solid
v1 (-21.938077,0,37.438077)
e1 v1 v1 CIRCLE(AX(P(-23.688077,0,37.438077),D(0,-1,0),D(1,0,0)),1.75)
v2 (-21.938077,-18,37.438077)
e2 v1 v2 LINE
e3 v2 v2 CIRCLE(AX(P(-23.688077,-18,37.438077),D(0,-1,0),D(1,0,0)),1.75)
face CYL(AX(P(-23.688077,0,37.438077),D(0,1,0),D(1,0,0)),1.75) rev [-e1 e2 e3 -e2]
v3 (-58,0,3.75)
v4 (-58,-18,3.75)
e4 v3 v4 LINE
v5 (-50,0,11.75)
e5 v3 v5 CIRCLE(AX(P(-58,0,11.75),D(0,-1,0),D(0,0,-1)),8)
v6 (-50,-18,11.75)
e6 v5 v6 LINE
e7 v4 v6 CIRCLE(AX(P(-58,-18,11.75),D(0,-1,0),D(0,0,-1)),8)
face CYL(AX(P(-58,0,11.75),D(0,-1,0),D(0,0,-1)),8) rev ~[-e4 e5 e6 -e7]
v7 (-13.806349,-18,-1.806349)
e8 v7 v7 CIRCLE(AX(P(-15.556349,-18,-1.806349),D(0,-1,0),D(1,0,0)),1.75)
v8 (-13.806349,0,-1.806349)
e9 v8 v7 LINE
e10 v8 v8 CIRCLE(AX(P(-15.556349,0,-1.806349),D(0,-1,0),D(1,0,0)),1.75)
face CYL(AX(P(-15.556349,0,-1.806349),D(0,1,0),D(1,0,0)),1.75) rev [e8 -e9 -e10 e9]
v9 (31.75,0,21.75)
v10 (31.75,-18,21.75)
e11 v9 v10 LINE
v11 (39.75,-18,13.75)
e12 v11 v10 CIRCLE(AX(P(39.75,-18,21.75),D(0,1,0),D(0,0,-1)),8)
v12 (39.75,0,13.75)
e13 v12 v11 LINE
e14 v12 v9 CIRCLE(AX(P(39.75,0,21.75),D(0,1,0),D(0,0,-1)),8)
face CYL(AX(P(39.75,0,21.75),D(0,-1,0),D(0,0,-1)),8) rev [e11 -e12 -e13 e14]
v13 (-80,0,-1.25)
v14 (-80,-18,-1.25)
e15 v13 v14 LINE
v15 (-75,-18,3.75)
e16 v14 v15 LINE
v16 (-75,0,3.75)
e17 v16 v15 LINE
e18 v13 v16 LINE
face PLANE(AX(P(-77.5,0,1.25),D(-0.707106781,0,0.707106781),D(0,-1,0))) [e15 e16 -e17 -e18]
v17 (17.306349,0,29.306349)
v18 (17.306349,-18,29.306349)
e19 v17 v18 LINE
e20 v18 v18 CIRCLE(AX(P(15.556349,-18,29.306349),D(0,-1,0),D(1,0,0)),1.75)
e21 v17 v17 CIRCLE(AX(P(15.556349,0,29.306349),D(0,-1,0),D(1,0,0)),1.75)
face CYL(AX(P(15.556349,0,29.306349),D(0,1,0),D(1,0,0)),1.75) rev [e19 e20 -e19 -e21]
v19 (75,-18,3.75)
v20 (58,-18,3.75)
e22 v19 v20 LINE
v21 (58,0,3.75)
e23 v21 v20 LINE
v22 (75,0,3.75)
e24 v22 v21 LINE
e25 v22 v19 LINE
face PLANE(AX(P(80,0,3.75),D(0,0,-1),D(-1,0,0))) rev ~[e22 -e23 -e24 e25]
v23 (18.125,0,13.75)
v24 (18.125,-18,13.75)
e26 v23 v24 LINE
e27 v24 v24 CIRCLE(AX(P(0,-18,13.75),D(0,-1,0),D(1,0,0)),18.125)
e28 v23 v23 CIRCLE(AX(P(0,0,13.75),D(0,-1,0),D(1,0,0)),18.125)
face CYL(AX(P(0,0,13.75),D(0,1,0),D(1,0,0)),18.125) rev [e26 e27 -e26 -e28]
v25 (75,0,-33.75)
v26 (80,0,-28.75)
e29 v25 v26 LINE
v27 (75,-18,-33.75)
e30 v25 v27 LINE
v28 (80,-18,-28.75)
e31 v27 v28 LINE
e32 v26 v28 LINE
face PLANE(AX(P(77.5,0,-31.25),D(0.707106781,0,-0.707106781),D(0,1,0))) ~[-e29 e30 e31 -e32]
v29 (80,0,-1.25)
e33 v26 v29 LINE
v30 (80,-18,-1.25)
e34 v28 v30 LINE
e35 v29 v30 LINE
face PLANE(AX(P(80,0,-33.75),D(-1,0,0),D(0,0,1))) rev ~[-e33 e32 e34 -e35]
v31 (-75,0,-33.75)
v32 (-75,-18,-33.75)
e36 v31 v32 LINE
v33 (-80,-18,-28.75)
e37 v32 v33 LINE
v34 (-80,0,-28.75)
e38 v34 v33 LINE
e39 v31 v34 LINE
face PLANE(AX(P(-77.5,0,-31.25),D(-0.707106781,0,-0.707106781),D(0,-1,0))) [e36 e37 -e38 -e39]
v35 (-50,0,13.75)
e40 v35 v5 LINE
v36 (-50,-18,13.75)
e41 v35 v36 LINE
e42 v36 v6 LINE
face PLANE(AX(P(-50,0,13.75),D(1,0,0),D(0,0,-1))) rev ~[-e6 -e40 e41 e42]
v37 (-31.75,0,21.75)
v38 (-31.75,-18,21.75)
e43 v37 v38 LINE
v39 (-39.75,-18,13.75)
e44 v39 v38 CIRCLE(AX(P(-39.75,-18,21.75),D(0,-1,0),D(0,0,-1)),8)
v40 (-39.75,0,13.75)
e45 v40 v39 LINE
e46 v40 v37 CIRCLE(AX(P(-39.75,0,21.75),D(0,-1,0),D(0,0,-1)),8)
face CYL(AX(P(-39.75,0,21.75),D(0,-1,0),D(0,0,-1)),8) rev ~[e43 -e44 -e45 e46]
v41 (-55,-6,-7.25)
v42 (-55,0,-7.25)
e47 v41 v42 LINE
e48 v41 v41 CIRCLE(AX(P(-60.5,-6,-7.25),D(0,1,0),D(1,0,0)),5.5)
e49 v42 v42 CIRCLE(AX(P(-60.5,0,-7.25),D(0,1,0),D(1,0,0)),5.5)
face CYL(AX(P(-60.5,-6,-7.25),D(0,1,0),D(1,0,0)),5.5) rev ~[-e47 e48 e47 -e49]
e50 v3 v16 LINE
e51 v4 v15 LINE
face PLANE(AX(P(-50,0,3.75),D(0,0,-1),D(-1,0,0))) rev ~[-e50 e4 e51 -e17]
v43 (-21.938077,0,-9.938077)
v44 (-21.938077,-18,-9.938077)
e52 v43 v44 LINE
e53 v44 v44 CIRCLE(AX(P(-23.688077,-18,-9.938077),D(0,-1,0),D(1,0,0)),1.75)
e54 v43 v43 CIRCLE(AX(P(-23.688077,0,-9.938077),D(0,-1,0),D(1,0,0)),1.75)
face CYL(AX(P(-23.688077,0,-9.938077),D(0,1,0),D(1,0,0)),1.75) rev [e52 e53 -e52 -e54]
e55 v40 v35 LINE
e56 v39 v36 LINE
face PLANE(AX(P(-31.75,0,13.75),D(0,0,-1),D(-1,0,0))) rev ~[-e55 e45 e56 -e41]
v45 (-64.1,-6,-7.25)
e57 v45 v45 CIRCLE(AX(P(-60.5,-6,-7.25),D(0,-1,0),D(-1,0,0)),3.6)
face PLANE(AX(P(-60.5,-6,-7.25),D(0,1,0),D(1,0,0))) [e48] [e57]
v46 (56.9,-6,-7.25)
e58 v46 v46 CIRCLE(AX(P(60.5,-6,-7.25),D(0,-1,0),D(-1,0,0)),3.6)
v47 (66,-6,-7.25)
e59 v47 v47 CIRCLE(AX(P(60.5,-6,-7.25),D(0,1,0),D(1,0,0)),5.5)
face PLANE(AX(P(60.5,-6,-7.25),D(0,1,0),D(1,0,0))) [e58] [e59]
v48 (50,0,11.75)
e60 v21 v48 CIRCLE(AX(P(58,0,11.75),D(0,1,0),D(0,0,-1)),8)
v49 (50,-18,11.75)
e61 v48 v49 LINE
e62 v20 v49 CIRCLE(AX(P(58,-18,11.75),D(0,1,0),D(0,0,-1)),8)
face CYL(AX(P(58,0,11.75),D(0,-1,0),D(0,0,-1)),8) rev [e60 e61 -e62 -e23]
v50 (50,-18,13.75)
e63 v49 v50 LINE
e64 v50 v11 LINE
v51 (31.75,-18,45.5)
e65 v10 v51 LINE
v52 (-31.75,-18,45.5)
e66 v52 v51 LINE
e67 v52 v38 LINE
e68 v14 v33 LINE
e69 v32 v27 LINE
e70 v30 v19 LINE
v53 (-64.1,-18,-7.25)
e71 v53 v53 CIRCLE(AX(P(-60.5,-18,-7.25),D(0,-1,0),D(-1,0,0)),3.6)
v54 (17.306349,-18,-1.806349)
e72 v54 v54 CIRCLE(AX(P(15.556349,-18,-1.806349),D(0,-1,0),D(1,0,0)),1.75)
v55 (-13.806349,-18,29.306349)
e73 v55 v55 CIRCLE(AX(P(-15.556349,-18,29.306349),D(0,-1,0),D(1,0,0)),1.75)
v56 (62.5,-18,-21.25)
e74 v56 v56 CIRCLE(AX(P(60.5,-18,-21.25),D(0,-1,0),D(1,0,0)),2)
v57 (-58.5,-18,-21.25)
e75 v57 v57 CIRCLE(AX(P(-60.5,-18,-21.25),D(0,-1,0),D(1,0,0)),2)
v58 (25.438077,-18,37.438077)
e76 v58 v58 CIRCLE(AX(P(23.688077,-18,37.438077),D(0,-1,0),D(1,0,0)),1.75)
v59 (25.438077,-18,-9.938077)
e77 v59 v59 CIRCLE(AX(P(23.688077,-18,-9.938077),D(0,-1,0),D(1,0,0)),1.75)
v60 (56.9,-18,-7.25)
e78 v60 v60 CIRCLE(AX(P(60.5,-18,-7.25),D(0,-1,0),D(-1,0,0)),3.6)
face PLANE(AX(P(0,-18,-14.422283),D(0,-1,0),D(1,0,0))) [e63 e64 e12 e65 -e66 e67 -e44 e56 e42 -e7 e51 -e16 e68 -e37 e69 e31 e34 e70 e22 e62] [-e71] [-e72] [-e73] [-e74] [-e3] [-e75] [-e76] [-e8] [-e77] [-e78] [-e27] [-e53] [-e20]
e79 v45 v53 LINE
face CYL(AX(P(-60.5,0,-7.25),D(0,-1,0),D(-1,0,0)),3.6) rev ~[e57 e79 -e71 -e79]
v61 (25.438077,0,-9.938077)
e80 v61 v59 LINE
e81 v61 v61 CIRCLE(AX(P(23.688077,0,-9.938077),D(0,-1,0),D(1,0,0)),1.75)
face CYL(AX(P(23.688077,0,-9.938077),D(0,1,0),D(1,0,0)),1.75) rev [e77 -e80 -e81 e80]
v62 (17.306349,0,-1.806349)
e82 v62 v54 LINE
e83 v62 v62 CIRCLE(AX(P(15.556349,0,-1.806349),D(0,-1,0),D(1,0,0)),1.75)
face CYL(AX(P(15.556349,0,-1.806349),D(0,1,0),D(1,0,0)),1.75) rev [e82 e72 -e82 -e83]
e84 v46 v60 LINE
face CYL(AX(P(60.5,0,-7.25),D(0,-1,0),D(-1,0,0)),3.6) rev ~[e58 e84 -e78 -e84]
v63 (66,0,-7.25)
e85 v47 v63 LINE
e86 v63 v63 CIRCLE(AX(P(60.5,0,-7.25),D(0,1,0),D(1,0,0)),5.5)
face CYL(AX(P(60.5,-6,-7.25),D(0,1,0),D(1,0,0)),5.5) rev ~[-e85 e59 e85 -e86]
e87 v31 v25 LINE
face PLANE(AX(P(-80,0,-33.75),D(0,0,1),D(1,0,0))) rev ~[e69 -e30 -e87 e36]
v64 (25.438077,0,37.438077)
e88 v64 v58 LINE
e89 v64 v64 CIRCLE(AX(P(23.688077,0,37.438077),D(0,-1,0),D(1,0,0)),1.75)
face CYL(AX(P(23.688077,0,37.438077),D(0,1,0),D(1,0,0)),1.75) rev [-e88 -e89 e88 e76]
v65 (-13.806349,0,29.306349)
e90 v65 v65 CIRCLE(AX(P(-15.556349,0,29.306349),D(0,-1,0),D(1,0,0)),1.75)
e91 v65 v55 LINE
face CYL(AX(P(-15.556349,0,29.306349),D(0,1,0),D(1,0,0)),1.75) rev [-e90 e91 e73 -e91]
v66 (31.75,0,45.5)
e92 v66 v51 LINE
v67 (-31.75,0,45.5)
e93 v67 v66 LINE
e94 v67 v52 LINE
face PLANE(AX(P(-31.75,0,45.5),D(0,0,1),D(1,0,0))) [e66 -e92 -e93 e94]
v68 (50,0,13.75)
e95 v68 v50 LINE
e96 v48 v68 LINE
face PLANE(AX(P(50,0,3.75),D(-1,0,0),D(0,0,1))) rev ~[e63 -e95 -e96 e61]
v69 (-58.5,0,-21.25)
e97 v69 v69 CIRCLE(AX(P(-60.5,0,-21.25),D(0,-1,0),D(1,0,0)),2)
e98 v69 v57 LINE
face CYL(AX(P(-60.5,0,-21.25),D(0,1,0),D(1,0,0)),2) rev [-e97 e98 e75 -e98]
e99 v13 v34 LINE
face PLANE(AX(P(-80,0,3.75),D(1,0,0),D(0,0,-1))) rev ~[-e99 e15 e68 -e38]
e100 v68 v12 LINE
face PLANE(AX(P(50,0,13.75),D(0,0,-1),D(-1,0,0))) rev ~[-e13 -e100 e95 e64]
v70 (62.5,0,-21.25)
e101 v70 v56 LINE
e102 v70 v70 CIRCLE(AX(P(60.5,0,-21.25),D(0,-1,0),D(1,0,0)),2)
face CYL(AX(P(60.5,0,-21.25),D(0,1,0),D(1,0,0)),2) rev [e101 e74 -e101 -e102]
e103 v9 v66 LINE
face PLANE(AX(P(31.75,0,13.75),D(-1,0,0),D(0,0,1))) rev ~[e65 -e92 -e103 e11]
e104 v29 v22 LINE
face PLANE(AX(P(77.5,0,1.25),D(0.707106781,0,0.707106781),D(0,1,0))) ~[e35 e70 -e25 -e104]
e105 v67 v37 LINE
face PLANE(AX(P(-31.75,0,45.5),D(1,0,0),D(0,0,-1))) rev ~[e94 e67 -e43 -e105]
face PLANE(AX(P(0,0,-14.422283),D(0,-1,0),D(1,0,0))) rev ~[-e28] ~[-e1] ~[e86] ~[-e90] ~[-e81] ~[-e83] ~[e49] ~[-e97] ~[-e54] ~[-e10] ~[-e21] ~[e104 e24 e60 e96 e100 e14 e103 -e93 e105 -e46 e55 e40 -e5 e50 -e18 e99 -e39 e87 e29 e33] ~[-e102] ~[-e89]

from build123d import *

# Parameters (mm, degrees)
F0_R           = 2
F0_W           = 63.5
F0_H           = 11.75
F0_R_2         = 1.75
F0_R_3         = 18.125
F1_DEPTH       = 18
F2_SIZE        = 5
F3_R           = 8
F4_D           = 7.2
F4_DEPTH       = 35
F4_CBORE_D     = 11
F4_CBORE_DEPTH = 6
F4_TIP         = 2.1630982285


with BuildPart() as f1:
    # F0 (on Front) → F1 (new body)
    with BuildSketch(Plane.XZ):
        Polygon((-80, -33.75), (80, -33.75), (80, 3.75), (50, 3.75), (50, 13.75), (31.75, 13.75), (31.75, -18), (-31.75, -18), (-31.75, 13.75), (-50, 13.75), (-50, 3.75), (-80, 3.75), align=None)
        with Locations((-60.5, -21.25)):
            Circle(F0_R, mode=Mode.SUBTRACT)
        with Locations((60.5, -21.25)):
            Circle(F0_R, mode=Mode.SUBTRACT)
        with Locations((0, 39.625)):
            Rectangle(F0_W, F0_H)
        with Locations((-23.6880771697, 37.4380771697)):
            Circle(F0_R_2, mode=Mode.SUBTRACT)
        with Locations((23.6880771697, 37.4380771697)):
            Circle(F0_R_2, mode=Mode.SUBTRACT)
        Polygon((31.75, 13.75), (31.75, 33.75), (-31.75, 33.75), (-31.75, 13.75), (-31.75, -18), (31.75, -18), align=None)
        with Locations((-23.6880771697, -9.9380771697)):
            Circle(F0_R_2, mode=Mode.SUBTRACT)
        with Locations((-15.5563491861, -1.8063491861)):
            Circle(F0_R_2, mode=Mode.SUBTRACT)
        with Locations((23.6880771697, -9.9380771697)):
            Circle(F0_R_2, mode=Mode.SUBTRACT)
        with Locations((15.5563491861, -1.8063491861)):
            Circle(F0_R_2, mode=Mode.SUBTRACT)
        with Locations((-15.5563491861, 29.3063491861)):
            Circle(F0_R_2, mode=Mode.SUBTRACT)
        with Locations((0, 13.75)):
            Circle(F0_R_3, mode=Mode.SUBTRACT)
        with Locations((15.5563491861, 29.3063491861)):
            Circle(F0_R_2, mode=Mode.SUBTRACT)
    extrude(amount=F1_DEPTH)

    # F2
    f2_edges = [f1.edges().sort_by_distance(p)[0] for p in [
        (-80, -9, -33.75),
        (80, -9, -33.75),
        (80, -9, 3.75),
        (-80, -9, 3.75),
    ]]
    chamfer(f2_edges, length=F2_SIZE)

    # F3
    f3_edges = [f1.edges().sort_by_distance(p)[0] for p in [
        (31.75, -9, 13.75),
        (-31.75, -9, 13.75),
        (50, -9, 3.75),
        (-50, -9, 3.75),
    ]]
    fillet(f3_edges, radius=F3_R)

    # F4
    with Locations(Plane(origin=(0, 0, 0), x_dir=(1, 0, 0), z_dir=(0, 1, 0))):
        with Locations((60.5, 7.25), (-60.5, 7.25)):
            CounterBoreHole(F4_D / 2, F4_CBORE_D / 2, F4_CBORE_DEPTH, depth=F4_DEPTH)
            with Locations((0, 0, -(F4_DEPTH + F4_TIP / 2))):  # 118° drill point
                Cone(0, F4_D / 2, F4_TIP, mode=Mode.SUBTRACT)


solid = f1.part
